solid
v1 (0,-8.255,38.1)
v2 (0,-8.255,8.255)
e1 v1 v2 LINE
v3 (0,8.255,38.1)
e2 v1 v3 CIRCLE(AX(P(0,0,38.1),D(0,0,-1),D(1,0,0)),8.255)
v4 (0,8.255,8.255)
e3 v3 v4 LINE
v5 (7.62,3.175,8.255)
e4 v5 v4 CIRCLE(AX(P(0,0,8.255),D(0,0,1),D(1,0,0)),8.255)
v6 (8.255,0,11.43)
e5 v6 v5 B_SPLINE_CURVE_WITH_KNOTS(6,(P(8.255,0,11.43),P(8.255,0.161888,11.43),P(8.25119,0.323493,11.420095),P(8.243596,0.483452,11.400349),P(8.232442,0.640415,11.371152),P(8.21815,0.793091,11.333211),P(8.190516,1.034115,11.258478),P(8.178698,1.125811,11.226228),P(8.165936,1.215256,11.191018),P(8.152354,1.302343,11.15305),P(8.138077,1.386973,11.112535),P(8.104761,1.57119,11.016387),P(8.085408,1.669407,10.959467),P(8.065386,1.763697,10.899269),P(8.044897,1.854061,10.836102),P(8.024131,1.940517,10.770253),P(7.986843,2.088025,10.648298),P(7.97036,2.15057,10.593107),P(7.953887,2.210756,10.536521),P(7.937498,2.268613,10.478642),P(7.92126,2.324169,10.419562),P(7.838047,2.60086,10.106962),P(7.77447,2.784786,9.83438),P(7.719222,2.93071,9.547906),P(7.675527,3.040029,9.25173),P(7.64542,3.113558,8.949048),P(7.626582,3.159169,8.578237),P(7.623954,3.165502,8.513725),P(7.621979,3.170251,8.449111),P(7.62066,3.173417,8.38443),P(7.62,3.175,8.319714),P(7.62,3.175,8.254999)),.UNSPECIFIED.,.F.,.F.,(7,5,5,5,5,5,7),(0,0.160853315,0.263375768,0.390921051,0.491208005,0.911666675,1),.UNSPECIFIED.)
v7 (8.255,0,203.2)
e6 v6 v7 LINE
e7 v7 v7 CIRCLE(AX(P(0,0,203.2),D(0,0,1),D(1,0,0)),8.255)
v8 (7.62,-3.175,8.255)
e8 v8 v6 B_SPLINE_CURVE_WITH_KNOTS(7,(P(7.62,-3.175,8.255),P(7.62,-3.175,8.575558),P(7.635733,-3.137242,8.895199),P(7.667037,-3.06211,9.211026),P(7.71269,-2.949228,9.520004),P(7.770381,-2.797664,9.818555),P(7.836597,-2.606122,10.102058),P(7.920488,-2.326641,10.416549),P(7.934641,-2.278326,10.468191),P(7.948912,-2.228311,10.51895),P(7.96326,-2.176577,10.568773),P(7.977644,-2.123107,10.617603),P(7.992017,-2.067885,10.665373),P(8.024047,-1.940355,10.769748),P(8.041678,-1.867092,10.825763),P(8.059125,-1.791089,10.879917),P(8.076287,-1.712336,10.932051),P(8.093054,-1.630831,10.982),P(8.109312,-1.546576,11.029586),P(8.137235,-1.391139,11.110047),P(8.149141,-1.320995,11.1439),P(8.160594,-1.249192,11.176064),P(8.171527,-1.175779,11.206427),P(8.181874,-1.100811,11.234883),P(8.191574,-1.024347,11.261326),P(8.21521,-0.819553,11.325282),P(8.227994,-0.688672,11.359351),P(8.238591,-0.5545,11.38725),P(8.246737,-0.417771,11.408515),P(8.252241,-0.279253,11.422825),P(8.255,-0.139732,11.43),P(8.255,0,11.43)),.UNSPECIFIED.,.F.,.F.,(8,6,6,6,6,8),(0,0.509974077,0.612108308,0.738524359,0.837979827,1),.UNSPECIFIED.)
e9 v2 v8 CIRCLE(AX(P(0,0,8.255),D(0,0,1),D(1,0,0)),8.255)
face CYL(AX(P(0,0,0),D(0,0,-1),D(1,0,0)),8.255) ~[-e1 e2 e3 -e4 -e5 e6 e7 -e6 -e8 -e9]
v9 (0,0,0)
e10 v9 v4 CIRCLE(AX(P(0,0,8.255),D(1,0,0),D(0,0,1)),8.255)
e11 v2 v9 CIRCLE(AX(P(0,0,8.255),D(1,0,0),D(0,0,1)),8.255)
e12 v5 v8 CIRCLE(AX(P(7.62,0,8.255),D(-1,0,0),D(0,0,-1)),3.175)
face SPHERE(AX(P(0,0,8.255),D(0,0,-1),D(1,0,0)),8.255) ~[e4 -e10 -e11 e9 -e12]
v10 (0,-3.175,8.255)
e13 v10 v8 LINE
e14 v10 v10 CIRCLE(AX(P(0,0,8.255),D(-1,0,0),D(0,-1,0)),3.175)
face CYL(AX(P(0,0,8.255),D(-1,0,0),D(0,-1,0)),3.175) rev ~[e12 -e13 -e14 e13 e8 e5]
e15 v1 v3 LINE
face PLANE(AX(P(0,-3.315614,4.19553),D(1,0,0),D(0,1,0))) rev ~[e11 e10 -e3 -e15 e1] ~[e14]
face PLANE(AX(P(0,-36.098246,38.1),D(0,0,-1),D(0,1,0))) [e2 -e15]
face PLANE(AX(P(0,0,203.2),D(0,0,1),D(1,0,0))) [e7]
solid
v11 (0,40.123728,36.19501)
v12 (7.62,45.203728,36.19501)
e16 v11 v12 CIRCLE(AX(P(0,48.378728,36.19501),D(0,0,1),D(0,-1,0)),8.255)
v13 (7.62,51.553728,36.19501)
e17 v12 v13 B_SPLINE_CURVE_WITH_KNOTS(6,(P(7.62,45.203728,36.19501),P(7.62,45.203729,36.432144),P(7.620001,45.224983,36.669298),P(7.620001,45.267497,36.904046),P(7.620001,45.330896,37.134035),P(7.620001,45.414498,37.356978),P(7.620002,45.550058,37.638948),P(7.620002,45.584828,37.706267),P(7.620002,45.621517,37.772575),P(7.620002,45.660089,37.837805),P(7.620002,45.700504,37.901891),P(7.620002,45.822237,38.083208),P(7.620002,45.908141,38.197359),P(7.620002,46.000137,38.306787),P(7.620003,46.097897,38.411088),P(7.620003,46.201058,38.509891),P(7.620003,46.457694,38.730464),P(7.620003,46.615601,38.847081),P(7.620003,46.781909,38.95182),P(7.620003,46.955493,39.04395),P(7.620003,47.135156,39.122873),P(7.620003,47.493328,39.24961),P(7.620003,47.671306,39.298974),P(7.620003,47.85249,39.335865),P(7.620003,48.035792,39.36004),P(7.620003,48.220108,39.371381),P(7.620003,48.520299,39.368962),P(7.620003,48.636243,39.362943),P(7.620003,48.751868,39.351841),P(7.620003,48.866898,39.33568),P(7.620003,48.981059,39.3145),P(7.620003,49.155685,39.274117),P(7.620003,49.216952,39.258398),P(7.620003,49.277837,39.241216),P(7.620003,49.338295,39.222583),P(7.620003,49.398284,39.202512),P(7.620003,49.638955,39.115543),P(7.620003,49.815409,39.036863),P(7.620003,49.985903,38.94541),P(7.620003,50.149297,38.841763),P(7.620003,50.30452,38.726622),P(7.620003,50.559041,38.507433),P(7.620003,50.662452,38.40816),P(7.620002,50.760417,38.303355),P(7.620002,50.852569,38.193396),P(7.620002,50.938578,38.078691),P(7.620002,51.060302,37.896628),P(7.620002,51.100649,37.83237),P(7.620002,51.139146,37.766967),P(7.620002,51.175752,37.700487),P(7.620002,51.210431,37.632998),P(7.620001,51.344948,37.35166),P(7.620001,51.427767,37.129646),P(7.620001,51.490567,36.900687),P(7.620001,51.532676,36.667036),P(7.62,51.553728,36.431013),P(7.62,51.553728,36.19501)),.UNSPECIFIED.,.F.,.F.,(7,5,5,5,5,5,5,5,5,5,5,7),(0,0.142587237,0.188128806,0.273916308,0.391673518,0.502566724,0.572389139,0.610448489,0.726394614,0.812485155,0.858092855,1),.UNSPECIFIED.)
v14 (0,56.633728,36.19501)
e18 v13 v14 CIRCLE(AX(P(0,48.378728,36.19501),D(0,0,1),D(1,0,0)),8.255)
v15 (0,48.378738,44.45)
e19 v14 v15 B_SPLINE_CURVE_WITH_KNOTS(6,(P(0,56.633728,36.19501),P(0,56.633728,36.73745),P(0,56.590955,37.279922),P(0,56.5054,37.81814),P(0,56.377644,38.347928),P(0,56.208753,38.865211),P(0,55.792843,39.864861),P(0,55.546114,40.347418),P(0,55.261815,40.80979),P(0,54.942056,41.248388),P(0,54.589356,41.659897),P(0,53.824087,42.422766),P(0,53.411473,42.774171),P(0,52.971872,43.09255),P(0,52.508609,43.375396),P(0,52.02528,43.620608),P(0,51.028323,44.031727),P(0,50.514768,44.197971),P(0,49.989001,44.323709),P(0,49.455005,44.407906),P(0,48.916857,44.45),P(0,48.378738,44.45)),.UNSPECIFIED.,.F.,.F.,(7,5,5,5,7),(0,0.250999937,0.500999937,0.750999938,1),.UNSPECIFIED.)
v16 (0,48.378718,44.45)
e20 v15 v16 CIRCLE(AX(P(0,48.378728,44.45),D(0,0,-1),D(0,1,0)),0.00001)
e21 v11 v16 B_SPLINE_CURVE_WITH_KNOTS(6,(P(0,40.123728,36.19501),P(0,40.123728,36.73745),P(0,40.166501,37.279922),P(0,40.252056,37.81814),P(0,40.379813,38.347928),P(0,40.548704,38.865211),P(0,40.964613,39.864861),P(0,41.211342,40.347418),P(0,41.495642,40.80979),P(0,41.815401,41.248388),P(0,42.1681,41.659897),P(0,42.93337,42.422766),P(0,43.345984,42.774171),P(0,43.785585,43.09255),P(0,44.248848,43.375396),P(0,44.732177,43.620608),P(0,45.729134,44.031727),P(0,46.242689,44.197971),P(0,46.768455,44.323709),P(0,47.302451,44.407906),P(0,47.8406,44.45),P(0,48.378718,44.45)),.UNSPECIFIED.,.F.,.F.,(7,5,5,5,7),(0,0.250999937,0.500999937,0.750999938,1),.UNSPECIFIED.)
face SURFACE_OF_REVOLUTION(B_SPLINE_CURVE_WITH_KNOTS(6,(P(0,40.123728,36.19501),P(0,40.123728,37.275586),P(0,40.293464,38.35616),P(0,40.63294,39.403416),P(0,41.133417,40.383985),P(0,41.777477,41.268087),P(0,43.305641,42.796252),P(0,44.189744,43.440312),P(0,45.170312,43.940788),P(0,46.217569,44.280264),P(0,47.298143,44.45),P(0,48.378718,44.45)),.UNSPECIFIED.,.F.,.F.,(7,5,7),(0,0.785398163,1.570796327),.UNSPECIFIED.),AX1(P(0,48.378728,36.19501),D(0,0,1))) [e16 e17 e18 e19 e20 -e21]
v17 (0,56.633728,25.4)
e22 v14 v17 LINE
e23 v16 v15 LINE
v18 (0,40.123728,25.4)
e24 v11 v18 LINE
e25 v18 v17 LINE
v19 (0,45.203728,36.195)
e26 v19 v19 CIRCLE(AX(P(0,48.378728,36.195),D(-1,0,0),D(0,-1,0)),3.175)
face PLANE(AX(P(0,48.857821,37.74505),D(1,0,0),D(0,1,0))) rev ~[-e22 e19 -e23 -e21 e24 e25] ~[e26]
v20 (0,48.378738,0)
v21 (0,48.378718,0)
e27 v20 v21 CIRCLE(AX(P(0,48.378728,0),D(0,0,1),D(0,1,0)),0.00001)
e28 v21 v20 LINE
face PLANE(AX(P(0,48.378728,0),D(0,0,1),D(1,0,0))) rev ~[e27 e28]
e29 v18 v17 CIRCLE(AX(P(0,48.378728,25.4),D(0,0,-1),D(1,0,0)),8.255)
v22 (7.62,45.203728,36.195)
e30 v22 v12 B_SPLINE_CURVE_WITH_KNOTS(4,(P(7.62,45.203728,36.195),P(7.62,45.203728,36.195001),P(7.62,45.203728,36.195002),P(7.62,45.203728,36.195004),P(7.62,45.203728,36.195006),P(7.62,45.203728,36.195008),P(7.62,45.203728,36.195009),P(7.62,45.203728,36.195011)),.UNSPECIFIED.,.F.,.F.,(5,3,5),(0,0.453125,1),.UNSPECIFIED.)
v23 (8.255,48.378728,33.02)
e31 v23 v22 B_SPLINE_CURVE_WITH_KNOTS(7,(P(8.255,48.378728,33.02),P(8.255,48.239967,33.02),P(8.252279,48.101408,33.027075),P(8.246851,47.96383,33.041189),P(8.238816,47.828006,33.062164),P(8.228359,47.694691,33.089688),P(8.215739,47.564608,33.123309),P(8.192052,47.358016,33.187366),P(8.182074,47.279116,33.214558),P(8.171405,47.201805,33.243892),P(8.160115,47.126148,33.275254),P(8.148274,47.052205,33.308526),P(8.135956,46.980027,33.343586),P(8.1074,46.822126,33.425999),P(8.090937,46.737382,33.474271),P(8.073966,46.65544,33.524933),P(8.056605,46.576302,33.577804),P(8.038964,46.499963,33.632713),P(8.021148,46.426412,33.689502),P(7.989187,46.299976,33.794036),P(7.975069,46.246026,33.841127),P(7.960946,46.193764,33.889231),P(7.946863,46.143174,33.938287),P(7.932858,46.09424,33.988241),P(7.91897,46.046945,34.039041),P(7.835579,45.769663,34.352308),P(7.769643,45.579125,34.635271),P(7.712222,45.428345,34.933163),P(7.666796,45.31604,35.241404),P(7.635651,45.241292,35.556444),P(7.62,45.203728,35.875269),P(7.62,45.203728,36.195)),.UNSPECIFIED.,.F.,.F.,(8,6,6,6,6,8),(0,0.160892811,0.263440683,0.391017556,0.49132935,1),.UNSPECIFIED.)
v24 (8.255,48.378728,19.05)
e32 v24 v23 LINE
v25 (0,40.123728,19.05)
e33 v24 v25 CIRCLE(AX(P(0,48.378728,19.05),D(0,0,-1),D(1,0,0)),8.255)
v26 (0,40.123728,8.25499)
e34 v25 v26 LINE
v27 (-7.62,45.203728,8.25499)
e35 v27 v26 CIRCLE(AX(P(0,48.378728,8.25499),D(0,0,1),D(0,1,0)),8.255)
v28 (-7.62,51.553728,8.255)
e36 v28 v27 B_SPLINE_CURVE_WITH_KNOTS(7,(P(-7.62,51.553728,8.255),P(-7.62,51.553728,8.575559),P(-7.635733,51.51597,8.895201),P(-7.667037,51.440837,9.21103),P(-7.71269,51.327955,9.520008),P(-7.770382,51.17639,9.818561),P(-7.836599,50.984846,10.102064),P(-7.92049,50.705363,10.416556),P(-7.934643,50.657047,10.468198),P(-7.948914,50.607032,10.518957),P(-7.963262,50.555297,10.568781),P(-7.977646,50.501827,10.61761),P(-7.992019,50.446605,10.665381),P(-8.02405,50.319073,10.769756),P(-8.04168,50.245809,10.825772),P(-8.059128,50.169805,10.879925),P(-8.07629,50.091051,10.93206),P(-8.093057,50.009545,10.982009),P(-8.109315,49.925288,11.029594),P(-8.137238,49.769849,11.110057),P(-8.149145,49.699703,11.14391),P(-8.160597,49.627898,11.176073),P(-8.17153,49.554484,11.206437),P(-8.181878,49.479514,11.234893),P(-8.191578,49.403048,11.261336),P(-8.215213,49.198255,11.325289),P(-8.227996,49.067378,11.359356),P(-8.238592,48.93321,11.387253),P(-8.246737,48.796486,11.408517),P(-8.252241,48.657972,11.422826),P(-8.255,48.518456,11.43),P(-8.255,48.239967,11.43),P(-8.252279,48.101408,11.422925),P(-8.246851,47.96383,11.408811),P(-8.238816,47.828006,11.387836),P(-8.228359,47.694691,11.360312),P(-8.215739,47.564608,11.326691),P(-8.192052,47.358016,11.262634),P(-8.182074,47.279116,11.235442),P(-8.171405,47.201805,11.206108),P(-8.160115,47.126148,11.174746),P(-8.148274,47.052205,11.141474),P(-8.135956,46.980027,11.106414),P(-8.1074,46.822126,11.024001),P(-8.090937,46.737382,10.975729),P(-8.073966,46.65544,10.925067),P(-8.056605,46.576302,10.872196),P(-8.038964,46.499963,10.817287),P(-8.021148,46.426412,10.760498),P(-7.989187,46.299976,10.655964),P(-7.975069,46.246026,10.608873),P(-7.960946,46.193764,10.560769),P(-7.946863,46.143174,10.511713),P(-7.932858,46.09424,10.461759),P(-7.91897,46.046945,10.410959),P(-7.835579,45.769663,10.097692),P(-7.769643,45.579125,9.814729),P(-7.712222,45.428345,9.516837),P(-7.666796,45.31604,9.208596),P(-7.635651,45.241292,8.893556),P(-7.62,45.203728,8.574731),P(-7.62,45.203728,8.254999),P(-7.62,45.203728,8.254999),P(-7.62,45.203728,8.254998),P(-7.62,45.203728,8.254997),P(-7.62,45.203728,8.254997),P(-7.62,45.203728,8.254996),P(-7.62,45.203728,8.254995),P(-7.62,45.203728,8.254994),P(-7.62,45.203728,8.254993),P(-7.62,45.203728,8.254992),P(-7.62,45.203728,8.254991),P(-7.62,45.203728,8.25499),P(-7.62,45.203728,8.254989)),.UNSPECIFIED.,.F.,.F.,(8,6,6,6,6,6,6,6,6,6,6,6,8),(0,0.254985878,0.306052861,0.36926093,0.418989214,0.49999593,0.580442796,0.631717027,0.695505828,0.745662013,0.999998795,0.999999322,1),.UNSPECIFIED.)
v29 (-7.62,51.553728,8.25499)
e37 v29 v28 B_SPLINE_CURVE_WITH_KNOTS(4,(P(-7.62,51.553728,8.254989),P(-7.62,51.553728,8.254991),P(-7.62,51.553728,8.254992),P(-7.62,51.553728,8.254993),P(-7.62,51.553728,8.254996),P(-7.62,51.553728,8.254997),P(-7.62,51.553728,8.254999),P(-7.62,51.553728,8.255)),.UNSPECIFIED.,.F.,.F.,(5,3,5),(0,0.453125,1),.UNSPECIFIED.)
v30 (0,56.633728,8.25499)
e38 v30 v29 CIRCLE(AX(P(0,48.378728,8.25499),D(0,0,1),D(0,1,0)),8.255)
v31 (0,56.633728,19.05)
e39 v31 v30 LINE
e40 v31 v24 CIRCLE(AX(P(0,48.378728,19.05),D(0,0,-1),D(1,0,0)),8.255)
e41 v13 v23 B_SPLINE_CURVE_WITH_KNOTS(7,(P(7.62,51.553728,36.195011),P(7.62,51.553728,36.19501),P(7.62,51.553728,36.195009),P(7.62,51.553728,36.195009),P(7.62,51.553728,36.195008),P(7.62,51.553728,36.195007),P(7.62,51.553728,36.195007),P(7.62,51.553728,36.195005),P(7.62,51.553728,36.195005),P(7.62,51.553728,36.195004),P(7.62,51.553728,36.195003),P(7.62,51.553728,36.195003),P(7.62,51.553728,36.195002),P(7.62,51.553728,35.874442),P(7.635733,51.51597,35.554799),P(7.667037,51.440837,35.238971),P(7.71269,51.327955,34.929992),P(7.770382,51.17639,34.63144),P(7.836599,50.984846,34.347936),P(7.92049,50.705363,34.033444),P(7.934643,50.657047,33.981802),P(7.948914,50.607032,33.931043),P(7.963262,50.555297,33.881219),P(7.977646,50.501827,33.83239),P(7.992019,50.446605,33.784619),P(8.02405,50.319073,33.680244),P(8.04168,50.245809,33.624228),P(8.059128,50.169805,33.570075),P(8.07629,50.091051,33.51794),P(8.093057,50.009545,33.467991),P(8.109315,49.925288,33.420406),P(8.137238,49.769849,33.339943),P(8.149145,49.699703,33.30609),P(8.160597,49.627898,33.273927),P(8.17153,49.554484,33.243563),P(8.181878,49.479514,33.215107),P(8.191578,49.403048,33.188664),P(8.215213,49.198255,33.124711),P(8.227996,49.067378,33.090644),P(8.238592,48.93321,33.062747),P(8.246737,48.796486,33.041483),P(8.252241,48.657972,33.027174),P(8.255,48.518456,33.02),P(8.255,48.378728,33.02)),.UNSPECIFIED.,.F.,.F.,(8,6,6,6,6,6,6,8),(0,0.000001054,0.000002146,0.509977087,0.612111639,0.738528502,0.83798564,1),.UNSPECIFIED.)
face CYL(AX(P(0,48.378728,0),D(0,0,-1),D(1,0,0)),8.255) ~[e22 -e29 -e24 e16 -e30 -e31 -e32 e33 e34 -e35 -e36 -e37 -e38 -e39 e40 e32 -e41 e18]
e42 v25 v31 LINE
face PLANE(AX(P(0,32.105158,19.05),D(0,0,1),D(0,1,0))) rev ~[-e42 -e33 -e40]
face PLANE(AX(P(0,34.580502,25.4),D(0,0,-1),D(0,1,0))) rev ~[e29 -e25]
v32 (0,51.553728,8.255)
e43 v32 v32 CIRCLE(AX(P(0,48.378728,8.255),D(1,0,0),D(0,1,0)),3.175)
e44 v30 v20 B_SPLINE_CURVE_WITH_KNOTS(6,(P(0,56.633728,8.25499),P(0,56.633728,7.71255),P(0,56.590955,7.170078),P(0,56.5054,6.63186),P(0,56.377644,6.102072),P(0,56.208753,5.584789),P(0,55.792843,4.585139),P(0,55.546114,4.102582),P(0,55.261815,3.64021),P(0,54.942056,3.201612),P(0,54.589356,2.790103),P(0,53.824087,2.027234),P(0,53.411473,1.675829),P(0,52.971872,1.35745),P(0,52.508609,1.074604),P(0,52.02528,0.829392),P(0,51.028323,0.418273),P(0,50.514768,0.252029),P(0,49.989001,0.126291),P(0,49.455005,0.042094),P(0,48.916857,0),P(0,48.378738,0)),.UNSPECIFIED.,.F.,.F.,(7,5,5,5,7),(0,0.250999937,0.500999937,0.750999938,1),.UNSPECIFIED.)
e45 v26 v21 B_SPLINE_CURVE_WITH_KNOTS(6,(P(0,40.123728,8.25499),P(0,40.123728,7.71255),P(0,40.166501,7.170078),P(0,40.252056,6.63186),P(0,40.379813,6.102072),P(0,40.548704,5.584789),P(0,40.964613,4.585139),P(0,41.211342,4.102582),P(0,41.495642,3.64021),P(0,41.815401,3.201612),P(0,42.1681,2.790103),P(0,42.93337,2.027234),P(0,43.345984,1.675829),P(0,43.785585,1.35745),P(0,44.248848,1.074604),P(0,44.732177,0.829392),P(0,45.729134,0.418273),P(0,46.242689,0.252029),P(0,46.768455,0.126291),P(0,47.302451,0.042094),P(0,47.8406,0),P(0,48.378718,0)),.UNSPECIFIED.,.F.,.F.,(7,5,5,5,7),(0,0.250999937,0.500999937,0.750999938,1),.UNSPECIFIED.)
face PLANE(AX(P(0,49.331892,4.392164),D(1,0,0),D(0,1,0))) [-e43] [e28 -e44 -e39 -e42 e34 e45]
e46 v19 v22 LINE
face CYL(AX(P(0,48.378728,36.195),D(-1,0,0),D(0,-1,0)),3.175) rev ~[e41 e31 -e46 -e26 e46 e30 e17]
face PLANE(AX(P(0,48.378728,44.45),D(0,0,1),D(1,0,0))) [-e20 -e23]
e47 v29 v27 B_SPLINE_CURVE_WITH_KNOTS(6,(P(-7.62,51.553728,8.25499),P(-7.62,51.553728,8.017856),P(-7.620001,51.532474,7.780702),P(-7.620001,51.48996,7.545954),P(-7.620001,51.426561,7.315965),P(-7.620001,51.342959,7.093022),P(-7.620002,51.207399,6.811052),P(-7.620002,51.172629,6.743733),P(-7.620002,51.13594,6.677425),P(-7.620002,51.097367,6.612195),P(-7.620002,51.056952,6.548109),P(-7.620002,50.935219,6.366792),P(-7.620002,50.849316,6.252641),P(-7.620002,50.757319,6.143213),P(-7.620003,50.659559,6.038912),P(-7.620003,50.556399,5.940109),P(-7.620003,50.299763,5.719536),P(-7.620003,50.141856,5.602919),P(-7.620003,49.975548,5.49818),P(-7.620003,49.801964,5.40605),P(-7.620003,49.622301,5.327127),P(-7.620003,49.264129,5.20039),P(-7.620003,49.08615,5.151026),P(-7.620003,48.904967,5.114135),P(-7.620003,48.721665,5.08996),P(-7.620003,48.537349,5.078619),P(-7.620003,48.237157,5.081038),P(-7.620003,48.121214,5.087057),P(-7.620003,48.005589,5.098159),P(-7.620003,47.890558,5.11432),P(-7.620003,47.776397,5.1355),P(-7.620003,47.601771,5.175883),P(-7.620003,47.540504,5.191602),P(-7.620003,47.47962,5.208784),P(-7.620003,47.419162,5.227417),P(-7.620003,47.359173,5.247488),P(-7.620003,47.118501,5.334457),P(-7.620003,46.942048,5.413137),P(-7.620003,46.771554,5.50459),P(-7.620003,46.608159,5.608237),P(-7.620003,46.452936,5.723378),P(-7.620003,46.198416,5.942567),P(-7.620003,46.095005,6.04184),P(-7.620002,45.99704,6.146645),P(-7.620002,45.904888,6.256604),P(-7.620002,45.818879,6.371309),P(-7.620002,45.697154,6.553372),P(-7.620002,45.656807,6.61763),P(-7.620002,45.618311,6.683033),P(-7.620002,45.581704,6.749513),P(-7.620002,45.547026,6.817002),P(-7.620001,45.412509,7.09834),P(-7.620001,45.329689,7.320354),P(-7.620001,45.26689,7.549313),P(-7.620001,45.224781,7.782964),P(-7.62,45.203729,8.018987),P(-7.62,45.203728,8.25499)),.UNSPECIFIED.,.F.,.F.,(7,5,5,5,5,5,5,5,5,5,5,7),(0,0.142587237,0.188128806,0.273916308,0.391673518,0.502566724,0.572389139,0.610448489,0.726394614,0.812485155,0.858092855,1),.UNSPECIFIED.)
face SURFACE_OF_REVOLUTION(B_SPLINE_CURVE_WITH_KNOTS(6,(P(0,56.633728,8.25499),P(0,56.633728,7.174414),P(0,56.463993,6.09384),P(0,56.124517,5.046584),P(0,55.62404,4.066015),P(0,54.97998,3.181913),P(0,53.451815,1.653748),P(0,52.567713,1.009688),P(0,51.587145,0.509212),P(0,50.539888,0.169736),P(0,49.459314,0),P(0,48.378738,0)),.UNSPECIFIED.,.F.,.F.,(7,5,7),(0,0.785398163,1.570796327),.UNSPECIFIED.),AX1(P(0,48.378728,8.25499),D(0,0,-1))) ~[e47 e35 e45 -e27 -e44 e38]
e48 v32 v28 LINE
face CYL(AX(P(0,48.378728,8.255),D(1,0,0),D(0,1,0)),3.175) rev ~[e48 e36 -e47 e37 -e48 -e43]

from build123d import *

# Parameters (mm, degrees)
F0_R      = 8.255
F1_DEPTH  = 203.2
F2_R      = 8.255
F3_W      = 65.5652643557
F3_H      = 67.8089395726
F4_DEPTH  = 25.4
F5_R      = 3.175
F6_DEPTH  = 25.4
F7_R      = 8.255
F8_DEPTH  = 44.45
F9_W      = 28.5546391179
F9_H      = 24.6901003341
F10_DEPTH = 25.4
F11_R     = 8.25499
F12_R     = 3.175
F13_DEPTH = 25.4
F14_W     = 34.453469107
F14_H     = 29.3156715315
F15_DEPTH = 25.4
F16_R     = 8.25499
F17_R     = 3.175
F18_DEPTH = 25.4


# Not quite as in the source:
# - a fillet or chamfer is up to 0.001 mm smaller than in the source, because OpenCascade refuses the exact size


with BuildPart() as f1:
    # F0 (on Top) → F1 (new body)
    with BuildSketch(Plane.XY):
        Circle(F0_R)
    extrude(amount=F1_DEPTH)

    # F2
    f2_edges = [f1.edges().sort_by_distance(p)[0] for p in [
        (-8.255, 0, 0),
    ]]
    fillet(f2_edges, radius=F2_R)

    # F3 (on Right) → F4 (cut)
    with BuildSketch(Plane.YZ):
        with Locations((-3.3156136051, 4.1955302137)):
            Rectangle(F3_W, F3_H)
    extrude(amount=-F4_DEPTH, mode=Mode.SUBTRACT)

    # F5 (on face) → F6 (cut)
    with BuildSketch(Plane(origin=(0, 0, 0), x_dir=(0, -1, 0), z_dir=(-1, 0, 0))):
        with Locations((0, 8.255)):
            Circle(F5_R)
    extrude(amount=-F6_DEPTH, mode=Mode.SUBTRACT)


with BuildPart() as f8:
    # F7 (on Top) → F8 (new body)
    with BuildSketch(Plane.XY):
        with Locations((0, 48.3787283301)):
            Circle(F7_R)
    extrude(amount=F8_DEPTH)

    # F9 (on Right) → F10 (cut)
    with BuildSketch(Plane.YZ):
        with Locations((48.8578211516, 37.745050167)):
            Rectangle(F9_W, F9_H)
    extrude(amount=-F10_DEPTH, mode=Mode.SUBTRACT)

    # F11 (radius 8.255 in the source; OpenCascade refuses exactly that, so slightly less here)
    f11_edges = [f8.edges().sort_by_distance(p)[0] for p in [
        (5.837166, 42.541562, 44.45),
        (5.837166, 54.215895, 44.45),
    ]]
    fillet(f11_edges, radius=F11_R)

    # F12 (on face) → F13 (cut)
    with BuildSketch(Plane(origin=(0, 0, 0), x_dir=(0, -1, 0), z_dir=(-1, 0, 0))):
        with Locations((-48.3787283301, 36.195)):
            Circle(F12_R)
    extrude(amount=-F13_DEPTH, mode=Mode.SUBTRACT)

    # F14 (on Right) → F15 (cut)
    with BuildSketch(Plane.YZ):
        with Locations((49.3318922818, 4.3921642342)):
            Rectangle(F14_W, F14_H)
    extrude(amount=F15_DEPTH, mode=Mode.SUBTRACT)

    # F16 (radius 8.255 in the source; OpenCascade refuses exactly that, so slightly less here)
    f16_edges = [f8.edges().sort_by_distance(p)[0] for p in [
        (-8.255, 48.378728, 0),
    ]]
    fillet(f16_edges, radius=F16_R)

    # F17 (on face) → F18 (cut)
    with BuildSketch(Plane.YZ):
        with Locations((48.3787283301, 8.255)):
            Circle(F17_R)
    extrude(amount=-F18_DEPTH, mode=Mode.SUBTRACT)


solid = Compound([f1.part, f8.part])
